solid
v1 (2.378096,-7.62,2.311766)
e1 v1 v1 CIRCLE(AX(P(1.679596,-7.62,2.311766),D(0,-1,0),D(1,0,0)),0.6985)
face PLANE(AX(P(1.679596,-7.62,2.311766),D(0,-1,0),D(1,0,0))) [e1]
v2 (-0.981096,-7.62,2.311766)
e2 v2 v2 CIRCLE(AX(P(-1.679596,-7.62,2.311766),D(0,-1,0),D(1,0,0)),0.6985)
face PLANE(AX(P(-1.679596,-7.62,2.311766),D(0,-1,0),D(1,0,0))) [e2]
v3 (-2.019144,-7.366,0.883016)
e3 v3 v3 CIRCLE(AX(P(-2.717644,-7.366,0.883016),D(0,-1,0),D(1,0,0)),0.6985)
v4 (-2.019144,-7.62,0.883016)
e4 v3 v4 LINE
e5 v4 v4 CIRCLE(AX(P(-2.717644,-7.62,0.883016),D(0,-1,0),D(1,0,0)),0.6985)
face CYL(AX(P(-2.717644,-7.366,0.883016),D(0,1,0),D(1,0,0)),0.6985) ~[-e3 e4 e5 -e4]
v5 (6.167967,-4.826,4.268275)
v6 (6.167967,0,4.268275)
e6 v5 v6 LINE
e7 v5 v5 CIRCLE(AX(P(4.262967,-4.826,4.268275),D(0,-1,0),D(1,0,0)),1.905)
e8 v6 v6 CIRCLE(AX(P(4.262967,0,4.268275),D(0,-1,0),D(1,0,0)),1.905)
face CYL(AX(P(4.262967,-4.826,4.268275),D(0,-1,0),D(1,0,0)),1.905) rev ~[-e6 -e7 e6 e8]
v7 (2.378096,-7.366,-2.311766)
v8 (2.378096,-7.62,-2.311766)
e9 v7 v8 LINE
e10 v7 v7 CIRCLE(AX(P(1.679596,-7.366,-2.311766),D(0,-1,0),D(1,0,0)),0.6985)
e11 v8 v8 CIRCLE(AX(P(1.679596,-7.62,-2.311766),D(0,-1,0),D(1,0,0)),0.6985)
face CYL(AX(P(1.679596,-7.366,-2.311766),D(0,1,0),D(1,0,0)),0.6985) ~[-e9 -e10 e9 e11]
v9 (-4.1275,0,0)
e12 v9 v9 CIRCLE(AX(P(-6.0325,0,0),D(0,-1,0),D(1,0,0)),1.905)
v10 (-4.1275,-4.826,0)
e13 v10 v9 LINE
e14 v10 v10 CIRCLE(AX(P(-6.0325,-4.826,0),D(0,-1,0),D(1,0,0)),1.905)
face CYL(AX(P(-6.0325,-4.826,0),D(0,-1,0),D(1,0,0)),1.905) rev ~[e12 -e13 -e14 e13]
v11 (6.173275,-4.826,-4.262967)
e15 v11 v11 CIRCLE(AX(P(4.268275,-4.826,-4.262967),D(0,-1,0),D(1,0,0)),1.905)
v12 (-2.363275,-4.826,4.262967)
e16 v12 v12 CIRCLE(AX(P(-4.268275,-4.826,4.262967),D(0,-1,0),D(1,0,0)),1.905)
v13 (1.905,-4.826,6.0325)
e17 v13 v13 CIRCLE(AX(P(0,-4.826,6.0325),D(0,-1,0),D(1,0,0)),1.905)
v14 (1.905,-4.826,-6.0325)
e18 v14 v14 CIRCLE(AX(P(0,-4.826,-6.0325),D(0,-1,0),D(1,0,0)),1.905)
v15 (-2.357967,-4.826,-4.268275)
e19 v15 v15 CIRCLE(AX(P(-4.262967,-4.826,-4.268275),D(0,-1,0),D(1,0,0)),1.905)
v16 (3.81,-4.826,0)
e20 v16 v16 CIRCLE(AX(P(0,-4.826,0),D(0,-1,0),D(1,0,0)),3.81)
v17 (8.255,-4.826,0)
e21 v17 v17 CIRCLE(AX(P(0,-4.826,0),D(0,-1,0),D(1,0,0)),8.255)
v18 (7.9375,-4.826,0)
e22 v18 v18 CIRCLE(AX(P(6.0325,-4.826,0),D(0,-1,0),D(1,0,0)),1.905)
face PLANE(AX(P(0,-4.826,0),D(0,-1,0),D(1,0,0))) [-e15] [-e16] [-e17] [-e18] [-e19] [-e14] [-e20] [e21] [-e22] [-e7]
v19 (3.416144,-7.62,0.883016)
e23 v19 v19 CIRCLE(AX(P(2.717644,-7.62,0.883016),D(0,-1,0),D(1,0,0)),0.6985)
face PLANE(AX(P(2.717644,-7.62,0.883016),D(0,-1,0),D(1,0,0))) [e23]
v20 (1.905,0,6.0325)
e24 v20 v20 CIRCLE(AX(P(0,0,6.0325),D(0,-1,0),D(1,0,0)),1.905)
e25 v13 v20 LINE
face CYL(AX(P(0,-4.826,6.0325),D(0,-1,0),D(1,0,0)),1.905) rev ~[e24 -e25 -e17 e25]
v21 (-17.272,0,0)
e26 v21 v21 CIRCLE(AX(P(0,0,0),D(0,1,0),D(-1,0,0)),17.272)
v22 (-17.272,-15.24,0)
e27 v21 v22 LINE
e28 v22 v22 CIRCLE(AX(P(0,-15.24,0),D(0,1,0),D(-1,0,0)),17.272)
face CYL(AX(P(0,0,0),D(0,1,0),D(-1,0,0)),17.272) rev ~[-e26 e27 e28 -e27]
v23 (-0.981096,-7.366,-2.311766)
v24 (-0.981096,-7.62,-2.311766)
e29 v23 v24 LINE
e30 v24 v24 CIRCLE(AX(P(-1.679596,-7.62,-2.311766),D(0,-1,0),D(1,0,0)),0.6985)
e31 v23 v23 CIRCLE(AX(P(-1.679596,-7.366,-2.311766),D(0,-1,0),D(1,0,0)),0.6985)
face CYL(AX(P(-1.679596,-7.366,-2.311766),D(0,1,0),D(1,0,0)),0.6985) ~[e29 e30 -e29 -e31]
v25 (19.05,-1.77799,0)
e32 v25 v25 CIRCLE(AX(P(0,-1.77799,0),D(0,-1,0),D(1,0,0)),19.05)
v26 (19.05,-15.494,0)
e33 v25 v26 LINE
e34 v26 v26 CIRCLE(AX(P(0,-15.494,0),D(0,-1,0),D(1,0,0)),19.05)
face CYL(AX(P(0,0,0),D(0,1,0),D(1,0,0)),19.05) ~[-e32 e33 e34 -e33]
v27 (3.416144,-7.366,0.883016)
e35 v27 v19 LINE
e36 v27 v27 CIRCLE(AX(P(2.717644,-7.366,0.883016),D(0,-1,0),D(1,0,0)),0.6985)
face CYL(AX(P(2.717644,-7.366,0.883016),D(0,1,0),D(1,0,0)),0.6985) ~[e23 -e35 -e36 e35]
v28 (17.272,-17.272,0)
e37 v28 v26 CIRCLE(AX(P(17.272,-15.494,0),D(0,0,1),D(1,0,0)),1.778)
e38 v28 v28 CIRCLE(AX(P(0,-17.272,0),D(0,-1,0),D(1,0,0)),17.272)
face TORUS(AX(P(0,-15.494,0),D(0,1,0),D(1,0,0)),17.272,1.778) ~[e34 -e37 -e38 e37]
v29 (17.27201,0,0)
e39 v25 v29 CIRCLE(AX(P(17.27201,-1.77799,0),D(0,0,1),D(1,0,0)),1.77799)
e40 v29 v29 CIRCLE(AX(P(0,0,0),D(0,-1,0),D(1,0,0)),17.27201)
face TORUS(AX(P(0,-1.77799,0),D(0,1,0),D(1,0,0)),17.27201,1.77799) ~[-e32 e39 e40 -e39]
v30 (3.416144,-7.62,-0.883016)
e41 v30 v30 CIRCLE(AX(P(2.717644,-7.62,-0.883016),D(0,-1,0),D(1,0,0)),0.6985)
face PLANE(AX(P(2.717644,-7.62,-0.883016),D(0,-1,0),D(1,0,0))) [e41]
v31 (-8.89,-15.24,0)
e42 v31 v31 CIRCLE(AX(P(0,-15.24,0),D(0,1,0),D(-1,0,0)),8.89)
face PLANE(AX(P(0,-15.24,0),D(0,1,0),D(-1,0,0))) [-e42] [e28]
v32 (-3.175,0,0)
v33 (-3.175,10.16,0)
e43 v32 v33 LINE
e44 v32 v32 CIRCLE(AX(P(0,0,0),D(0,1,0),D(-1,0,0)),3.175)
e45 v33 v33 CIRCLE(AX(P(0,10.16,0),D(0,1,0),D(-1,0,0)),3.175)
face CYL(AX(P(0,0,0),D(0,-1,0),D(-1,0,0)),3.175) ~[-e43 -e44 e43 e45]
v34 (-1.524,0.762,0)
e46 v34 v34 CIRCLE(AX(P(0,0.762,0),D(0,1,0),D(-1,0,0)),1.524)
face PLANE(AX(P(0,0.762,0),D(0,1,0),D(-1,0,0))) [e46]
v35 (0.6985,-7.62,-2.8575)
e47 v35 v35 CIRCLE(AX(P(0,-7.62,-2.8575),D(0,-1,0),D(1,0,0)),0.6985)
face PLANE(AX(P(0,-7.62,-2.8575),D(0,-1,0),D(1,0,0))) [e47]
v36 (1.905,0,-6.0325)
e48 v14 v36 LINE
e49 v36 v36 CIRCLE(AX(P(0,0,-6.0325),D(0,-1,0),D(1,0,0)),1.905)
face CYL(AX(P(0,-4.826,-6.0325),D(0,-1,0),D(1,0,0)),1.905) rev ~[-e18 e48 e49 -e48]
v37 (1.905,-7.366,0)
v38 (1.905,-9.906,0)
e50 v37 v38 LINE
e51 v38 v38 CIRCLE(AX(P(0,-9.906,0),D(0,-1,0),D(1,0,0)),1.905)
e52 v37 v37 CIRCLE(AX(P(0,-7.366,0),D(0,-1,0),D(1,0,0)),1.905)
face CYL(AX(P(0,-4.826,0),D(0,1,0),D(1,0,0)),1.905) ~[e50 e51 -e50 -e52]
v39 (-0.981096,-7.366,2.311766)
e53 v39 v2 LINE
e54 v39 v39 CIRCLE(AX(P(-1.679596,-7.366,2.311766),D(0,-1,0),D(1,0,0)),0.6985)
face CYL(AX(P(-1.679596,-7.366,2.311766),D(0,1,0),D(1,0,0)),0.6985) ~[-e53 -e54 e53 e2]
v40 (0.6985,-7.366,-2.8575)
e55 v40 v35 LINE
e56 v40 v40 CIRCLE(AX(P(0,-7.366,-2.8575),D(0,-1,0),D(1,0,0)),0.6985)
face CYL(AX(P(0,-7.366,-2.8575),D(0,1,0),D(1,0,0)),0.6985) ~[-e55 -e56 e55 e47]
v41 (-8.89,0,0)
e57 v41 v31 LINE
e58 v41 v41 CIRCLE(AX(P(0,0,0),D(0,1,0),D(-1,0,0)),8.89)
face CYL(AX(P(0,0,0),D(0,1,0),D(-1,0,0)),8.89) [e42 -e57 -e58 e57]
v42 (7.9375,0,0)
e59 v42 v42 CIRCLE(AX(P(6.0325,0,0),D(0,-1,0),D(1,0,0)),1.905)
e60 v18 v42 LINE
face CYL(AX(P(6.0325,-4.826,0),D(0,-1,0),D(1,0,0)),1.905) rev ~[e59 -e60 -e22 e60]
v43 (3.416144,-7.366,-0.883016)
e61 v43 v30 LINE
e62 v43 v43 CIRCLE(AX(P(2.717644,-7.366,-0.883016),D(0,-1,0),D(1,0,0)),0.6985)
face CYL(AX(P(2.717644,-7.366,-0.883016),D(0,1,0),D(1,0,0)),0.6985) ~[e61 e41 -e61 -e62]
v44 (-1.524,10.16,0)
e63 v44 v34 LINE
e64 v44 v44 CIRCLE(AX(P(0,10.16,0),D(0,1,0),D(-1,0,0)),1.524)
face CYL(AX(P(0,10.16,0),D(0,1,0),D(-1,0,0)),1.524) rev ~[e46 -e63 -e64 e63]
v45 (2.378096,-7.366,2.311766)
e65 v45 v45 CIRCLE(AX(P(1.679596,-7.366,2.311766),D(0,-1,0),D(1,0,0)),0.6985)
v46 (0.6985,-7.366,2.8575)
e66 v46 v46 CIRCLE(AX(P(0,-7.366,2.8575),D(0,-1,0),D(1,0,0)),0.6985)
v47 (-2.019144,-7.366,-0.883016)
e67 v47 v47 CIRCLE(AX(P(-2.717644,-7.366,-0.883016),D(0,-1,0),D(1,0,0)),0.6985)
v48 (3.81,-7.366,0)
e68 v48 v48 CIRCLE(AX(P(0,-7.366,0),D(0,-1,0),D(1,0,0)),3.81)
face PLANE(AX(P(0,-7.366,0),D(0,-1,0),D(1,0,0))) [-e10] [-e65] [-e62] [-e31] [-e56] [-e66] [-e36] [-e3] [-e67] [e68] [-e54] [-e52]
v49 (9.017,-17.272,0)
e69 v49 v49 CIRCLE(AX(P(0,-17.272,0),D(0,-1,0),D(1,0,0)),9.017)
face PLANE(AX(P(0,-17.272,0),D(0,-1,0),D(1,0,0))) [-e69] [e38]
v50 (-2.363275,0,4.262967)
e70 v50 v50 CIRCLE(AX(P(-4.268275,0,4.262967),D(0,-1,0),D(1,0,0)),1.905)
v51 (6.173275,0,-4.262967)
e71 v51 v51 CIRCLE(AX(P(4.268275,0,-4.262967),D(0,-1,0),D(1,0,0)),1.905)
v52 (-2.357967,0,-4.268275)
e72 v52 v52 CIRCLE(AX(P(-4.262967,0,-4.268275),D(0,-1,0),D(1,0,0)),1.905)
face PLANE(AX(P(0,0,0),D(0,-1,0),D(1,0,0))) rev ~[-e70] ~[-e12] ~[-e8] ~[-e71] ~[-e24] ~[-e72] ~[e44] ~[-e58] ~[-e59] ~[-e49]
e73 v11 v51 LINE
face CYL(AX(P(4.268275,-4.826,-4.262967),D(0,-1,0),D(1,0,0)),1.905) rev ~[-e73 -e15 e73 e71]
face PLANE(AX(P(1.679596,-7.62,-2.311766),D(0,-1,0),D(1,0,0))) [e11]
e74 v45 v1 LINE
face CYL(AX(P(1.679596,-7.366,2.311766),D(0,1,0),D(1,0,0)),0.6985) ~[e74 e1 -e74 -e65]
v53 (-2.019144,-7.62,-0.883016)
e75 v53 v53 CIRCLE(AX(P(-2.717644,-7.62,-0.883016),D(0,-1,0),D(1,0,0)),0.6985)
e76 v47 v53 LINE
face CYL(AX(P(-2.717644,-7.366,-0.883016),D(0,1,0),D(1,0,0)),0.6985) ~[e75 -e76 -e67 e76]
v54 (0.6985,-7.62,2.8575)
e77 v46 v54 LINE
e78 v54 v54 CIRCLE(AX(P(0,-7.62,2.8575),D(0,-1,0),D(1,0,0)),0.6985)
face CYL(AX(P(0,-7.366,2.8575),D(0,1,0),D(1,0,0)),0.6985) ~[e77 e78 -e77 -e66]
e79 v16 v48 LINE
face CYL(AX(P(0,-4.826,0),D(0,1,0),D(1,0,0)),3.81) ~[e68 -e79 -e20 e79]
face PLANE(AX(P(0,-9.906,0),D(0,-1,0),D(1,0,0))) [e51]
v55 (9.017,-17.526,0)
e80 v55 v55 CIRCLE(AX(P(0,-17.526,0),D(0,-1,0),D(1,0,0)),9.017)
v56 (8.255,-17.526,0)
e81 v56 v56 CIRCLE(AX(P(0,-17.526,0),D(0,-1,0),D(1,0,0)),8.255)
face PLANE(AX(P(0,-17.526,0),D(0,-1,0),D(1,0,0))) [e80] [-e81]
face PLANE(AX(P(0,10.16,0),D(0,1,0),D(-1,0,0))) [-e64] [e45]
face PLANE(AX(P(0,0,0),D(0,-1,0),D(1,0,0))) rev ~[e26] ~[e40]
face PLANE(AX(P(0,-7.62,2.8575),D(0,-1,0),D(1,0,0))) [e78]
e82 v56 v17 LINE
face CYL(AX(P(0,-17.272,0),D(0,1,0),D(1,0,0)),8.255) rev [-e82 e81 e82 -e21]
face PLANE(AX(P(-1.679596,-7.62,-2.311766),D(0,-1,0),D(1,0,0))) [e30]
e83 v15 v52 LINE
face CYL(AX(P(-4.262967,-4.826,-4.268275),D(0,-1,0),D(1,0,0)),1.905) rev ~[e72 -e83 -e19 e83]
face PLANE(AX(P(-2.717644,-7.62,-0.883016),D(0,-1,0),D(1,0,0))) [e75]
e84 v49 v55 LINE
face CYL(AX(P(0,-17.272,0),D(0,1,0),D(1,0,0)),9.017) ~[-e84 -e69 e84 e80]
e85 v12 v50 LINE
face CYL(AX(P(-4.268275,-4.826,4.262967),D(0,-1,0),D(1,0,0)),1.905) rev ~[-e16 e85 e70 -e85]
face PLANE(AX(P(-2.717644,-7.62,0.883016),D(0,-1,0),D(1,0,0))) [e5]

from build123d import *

# Parameters (mm, degrees)
F0_R      = 19.05
F1_DEPTH  = 17.272
F2_R      = 3.175
F3_DEPTH  = 10.16
F4_R      = 1.524
F5_DEPTH  = 9.398
F7_R      = 8.255
F8_DEPTH  = 12.446
F9_R      = 17.272
F9_R_2    = 8.89
F10_DEPTH = 15.24
F11_R     = 9.017
F11_R_2   = 8.255
F12_DEPTH = 0.254
F13_R     = 1.905
F14_DEPTH = 5.08
F15_R     = 3.81
F15_R_2   = 1.905
F16_DEPTH = 2.54
F17_R     = 1.905
F18_DEPTH = 14.987
F19_R     = 0.6985
F20_DEPTH = 0.254
F21_R     = 1.778
F22_R     = 1.77799


# Not quite as in the source:
# - a fillet or chamfer is up to 0.001 mm smaller than in the source, because OpenCascade refuses the exact size


with BuildPart() as f1:
    # F0 (on Front) → F1 (new body)
    with BuildSketch(Plane.XZ):
        Circle(F0_R)
    extrude(amount=F1_DEPTH)

    # F2 (on face) → F3 (join)
    with BuildSketch(Plane(origin=(0, 0, 0), x_dir=(-1, 0, 0), z_dir=(0, 1, 0))):
        Circle(F2_R)
    extrude(amount=F3_DEPTH)

    # F4 (on face) → F5 (cut)
    with BuildSketch(Plane(origin=(0, 10.16, 0), x_dir=(-1, 0, 0), z_dir=(0, 1, 0))):
        Circle(F4_R)
    extrude(amount=-F5_DEPTH, mode=Mode.SUBTRACT)

    # F7 (on face) → F8 (cut)
    with BuildSketch(Plane.XZ.offset(17.272)):
        Circle(F7_R)
    extrude(amount=-F8_DEPTH, mode=Mode.SUBTRACT)

    # F9 (on face) → F10 (cut)
    with BuildSketch(Plane(origin=(0, 0, 0), x_dir=(-1, 0, 0), z_dir=(0, 1, 0))):
        Circle(F9_R)
        Circle(F9_R_2, mode=Mode.SUBTRACT)
    extrude(amount=-F10_DEPTH, mode=Mode.SUBTRACT)

    # F11 (on face) → F12 (join)
    with BuildSketch(Plane.XZ.offset(17.272)):
        Circle(F11_R)
        Circle(F11_R_2, mode=Mode.SUBTRACT)
    extrude(amount=F12_DEPTH)

    # F13 (on face) → F14 (join)
    with BuildSketch(Plane.XZ.offset(4.826)):
        Circle(F13_R)
    extrude(amount=F14_DEPTH)

    # F15 (on face) → F16 (join)
    with BuildSketch(Plane.XZ.offset(4.826)):
        Circle(F15_R)
        Circle(F15_R_2, mode=Mode.SUBTRACT)
    extrude(amount=F16_DEPTH)

    # F17 (on face) → F18 (cut, through all)
    with BuildSketch(Plane.XZ.offset(4.826)):
        with Locations((-4.2682749969, 4.2629666667)):
            Circle(F17_R)
        with Locations((0, 6.0325)):
            Circle(F17_R)
        with Locations((4.2629666667, 4.2682749969)):
            Circle(F17_R)
        with Locations((6.0325, 0)):
            Circle(F17_R)
        with Locations((4.2682749969, -4.2629666667)):
            Circle(F17_R)
        with Locations((0, -6.0325)):
            Circle(F17_R)
        with Locations((-4.2629666667, -4.2682749969)):
            Circle(F17_R)
        with Locations((-6.0325, 0)):
            Circle(F17_R)
    extrude(amount=-F18_DEPTH, mode=Mode.SUBTRACT)

    # F19 (on face) → F20 (join)
    with BuildSketch(Plane.XZ.offset(7.366)):
        with Locations((-1.6795963584, 2.3117660614)):
            Circle(F19_R)
        with Locations((0, 2.8575)):
            Circle(F19_R)
        with Locations((1.6795963584, 2.3117660614)):
            Circle(F19_R)
        with Locations((2.7176439953, 0.8830160614)):
            Circle(F19_R)
        with Locations((1.6795963584, -2.3117660614)):
            Circle(F19_R)
        with Locations((0, -2.8575)):
            Circle(F19_R)
        with Locations((2.7176439953, -0.8830160614)):
            Circle(F19_R)
        with Locations((-1.6795963584, -2.3117660614)):
            Circle(F19_R)
        with Locations((-2.7176439953, -0.8830160614)):
            Circle(F19_R)
        with Locations((-2.7176439953, 0.8830160614)):
            Circle(F19_R)
    extrude(amount=F20_DEPTH)

    # F21
    f21_edges = [f1.edges().sort_by_distance(p)[0] for p in [
        (-19.05, -17.272, 0),
    ]]
    fillet(f21_edges, radius=F21_R)

    # F22 (radius 1.778 in the source; OpenCascade refuses exactly that, so slightly less here)
    f22_edges = [f1.edges().sort_by_distance(p)[0] for p in [
        (-19.05, 0, 0),
    ]]
    fillet(f22_edges, radius=F22_R)


solid = f1.part
